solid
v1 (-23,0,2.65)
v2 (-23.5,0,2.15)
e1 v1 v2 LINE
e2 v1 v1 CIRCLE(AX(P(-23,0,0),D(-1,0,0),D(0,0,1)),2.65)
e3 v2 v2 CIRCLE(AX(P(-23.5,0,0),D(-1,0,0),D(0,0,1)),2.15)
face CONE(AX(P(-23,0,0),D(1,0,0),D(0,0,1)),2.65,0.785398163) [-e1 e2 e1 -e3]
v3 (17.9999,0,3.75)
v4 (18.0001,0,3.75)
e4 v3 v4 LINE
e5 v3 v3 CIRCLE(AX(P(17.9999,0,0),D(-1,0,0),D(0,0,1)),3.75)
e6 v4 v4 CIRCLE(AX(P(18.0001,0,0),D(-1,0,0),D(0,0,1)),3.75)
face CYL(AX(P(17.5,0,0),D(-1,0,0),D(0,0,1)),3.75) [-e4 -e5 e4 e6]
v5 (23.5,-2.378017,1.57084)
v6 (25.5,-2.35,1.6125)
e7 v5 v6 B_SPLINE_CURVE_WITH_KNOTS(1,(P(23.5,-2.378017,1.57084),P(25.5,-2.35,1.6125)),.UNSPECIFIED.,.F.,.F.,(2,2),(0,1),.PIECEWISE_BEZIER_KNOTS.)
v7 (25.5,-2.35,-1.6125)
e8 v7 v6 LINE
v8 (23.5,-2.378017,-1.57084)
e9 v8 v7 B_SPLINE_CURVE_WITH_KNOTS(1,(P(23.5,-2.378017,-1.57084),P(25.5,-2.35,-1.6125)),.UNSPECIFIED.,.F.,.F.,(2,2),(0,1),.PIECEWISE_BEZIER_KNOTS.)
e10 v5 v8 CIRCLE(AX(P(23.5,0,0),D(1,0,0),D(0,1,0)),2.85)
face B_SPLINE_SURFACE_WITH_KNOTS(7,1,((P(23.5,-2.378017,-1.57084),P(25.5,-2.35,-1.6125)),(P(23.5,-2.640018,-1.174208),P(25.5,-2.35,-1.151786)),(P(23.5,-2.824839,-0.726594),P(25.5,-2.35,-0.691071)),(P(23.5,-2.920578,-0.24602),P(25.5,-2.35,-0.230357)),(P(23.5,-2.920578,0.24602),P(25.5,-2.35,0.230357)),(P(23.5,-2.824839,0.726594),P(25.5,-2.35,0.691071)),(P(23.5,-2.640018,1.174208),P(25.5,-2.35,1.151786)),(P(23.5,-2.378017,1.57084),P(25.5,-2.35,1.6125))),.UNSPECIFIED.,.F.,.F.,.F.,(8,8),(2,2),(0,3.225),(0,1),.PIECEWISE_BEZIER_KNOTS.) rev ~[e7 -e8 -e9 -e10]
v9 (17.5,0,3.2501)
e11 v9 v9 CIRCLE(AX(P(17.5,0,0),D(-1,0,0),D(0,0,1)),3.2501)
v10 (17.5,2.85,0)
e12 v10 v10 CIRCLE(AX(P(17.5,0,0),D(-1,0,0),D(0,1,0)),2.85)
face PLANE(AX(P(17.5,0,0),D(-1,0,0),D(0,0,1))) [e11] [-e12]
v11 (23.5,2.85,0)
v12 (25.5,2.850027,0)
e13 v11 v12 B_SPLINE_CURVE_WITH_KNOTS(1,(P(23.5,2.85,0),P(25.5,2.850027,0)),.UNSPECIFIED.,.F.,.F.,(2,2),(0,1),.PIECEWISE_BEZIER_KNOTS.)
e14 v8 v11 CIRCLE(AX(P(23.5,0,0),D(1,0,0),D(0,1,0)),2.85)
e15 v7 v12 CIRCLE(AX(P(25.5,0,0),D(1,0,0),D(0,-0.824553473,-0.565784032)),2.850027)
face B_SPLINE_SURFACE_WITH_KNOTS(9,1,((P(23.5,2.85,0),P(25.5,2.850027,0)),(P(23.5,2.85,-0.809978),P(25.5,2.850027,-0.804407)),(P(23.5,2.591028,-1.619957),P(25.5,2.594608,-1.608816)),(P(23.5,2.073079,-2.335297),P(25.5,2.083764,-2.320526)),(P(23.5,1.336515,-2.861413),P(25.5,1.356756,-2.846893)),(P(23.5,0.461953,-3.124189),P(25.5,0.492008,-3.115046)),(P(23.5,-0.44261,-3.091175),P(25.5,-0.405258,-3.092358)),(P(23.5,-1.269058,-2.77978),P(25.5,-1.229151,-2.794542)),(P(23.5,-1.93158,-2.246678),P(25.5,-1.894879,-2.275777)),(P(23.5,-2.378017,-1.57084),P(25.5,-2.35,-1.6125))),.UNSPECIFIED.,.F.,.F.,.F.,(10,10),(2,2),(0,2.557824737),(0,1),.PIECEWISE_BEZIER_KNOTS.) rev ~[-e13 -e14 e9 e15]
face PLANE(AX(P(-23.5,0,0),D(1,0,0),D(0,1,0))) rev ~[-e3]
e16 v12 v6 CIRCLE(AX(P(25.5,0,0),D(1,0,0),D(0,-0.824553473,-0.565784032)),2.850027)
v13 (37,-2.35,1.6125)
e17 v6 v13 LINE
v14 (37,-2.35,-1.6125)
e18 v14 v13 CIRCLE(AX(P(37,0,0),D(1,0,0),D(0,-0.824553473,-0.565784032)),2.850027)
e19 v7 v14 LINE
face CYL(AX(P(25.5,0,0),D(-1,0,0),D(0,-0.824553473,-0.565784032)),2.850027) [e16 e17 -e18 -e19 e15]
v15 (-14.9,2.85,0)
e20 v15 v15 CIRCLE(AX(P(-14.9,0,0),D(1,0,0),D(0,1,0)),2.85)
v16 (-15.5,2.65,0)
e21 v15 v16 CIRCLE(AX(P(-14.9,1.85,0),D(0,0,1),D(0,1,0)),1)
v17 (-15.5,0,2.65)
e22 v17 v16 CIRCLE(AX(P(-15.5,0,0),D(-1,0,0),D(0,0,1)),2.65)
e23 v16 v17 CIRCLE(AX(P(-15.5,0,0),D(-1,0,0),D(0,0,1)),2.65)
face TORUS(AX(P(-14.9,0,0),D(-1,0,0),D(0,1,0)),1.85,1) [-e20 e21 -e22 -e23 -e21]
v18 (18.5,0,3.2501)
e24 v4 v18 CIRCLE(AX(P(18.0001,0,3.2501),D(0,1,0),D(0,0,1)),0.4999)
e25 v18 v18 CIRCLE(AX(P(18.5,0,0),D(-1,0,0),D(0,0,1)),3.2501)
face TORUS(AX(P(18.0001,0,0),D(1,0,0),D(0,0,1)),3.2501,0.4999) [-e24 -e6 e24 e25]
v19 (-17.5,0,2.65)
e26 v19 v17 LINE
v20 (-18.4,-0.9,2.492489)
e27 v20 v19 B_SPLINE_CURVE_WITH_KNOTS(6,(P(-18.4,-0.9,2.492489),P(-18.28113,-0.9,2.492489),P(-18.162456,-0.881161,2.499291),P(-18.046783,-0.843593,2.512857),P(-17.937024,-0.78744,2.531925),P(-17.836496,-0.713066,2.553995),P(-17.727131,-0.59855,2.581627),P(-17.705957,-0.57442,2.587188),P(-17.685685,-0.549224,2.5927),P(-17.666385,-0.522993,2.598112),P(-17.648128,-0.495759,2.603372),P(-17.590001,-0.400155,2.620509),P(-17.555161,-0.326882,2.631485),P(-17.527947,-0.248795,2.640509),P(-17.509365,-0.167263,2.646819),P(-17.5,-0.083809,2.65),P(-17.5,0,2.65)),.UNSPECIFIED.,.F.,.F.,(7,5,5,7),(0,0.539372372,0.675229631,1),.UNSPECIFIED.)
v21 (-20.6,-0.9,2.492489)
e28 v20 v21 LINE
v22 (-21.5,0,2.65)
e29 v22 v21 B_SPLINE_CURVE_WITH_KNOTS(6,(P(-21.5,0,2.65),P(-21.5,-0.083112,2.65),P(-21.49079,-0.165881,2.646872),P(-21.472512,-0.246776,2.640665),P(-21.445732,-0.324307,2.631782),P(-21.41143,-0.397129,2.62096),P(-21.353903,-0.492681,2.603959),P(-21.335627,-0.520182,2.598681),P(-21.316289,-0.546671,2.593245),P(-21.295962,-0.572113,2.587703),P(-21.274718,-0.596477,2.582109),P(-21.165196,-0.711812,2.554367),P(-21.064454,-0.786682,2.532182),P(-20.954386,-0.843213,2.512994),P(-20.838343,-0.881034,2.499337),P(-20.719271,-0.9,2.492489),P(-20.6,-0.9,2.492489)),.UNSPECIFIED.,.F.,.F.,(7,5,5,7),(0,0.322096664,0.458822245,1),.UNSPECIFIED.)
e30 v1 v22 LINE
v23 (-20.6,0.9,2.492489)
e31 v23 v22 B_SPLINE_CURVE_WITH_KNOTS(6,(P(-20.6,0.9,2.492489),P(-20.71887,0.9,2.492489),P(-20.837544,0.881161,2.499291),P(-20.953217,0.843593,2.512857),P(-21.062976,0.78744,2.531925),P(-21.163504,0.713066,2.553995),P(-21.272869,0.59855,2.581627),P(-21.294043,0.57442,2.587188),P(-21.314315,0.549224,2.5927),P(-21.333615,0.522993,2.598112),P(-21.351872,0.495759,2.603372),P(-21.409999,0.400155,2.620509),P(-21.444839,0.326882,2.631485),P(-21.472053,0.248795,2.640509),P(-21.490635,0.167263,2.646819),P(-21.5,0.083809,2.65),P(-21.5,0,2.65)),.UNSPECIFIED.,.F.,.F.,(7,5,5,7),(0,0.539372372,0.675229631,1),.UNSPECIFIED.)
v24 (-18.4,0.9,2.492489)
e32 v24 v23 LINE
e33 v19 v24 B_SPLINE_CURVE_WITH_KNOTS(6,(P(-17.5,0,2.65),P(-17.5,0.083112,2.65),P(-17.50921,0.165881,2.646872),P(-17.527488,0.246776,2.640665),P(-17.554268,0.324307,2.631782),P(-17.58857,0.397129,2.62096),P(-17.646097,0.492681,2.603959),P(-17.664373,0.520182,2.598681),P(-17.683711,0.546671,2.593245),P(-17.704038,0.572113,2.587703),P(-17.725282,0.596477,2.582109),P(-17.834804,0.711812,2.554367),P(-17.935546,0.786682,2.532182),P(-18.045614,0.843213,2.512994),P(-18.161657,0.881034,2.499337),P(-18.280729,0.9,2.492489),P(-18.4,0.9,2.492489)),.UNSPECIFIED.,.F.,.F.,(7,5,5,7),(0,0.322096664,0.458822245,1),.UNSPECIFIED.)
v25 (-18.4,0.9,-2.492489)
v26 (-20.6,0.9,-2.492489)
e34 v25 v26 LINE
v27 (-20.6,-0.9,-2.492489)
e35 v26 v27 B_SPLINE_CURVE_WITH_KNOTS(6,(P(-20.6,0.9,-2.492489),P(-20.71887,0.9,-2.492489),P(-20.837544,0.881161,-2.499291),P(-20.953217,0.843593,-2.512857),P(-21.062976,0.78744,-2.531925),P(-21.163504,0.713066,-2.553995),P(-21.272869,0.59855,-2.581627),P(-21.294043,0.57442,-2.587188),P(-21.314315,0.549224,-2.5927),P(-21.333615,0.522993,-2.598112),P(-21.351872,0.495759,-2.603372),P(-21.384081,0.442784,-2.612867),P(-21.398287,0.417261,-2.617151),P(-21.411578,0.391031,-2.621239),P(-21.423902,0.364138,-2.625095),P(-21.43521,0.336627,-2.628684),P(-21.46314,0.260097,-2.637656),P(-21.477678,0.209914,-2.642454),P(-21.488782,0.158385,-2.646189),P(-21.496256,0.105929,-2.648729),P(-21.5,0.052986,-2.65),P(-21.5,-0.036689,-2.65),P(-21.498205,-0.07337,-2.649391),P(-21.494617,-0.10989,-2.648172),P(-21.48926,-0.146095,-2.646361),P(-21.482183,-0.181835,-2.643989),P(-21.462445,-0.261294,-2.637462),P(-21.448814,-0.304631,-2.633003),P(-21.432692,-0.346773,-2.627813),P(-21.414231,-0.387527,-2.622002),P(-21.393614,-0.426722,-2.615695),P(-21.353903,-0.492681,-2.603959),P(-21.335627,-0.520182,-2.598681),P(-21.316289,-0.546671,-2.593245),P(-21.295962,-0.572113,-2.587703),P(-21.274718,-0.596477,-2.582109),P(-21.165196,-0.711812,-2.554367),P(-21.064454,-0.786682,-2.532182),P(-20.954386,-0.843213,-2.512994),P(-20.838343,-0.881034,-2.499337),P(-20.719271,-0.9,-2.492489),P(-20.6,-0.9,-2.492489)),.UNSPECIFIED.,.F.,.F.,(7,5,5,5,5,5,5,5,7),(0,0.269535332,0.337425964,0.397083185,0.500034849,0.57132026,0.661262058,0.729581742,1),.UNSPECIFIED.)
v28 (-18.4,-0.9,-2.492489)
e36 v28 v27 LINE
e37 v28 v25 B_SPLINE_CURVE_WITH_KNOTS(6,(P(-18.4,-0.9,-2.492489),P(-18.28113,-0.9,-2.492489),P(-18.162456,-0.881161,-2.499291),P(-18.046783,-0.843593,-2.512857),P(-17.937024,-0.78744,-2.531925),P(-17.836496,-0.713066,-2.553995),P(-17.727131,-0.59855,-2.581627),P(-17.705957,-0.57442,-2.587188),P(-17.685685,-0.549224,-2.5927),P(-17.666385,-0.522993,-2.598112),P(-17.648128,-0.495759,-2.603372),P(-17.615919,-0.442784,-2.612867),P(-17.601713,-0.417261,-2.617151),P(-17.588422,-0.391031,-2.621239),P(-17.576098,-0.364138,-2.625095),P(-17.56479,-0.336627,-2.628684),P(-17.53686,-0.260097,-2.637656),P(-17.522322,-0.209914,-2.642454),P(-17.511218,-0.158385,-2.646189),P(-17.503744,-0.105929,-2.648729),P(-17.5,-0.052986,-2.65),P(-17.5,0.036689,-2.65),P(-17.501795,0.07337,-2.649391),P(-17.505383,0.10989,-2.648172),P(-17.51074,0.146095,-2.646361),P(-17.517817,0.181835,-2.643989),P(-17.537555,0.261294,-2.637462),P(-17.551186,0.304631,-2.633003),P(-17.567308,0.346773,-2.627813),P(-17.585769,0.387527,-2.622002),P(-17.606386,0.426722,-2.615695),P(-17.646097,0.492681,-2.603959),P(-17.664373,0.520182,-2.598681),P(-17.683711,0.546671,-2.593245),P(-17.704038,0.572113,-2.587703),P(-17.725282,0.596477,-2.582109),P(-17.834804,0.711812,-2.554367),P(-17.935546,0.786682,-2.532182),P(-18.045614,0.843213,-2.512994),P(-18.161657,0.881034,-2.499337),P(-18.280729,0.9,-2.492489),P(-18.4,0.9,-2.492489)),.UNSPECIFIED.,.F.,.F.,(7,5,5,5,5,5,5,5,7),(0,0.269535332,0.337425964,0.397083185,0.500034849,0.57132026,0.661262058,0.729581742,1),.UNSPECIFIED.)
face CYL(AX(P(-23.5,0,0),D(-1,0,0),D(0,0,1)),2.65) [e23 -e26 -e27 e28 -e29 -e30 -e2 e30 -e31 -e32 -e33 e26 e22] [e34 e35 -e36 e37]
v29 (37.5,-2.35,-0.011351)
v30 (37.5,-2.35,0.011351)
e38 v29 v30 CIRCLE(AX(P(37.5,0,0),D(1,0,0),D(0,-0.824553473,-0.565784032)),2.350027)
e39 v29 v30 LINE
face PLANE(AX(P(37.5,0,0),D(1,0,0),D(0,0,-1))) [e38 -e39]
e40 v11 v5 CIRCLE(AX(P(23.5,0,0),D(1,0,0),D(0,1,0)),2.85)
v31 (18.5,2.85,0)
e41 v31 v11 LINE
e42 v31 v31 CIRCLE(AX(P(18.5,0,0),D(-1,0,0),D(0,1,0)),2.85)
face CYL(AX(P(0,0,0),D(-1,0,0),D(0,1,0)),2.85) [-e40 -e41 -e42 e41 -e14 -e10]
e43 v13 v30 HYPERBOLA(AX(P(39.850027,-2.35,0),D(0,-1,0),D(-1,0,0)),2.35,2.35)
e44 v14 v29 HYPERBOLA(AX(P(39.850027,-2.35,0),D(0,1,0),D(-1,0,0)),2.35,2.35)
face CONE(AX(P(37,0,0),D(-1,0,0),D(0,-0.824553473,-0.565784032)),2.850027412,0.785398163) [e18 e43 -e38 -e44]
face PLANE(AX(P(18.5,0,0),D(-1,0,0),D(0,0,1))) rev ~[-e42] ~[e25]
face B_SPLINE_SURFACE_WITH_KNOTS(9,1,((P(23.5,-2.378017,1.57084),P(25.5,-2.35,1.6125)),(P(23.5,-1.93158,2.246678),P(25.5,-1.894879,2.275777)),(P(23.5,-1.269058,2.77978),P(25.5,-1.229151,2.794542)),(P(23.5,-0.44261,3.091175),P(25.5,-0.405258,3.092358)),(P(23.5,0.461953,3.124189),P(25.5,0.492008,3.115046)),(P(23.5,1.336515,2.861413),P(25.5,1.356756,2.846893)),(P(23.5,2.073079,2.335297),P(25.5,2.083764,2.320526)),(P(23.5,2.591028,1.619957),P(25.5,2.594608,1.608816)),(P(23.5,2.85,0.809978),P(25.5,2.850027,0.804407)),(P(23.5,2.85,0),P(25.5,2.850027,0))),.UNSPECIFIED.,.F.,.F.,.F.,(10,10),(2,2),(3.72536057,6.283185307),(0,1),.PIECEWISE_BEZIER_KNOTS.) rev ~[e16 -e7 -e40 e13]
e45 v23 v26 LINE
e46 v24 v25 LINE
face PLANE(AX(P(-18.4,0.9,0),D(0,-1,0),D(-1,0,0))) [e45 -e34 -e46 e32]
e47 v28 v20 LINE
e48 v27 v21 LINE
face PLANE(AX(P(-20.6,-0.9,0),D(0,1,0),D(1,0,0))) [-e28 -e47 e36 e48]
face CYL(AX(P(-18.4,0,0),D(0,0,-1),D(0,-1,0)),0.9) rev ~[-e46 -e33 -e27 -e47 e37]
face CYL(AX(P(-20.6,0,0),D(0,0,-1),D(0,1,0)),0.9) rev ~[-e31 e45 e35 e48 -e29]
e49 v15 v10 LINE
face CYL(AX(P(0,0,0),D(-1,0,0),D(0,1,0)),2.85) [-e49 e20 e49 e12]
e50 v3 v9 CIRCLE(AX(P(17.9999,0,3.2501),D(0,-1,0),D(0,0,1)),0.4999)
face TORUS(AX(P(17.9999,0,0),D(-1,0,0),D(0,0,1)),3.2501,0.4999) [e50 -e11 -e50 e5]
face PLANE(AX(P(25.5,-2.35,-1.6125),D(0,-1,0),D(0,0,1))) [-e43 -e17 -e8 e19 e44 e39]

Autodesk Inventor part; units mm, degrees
ref_plane "YZ Plane" through (0, 0, 0) normal (1, 0, 0) x (0, 1, 0)
sketch "Sketch1" plane through (0, 0, 0) normal (1, 0, 0) x (0, 1, 0)
  circle A0 centre (0, 0) radius 2.85
  dimension "diameter" = 5.7
extrude "Shaft" add sketch "Sketch1" along normal mid plane 47
sketch "Sketch2" plane through (0, 0, 0) normal (0, 0, 1) x (1, 0, 0)
  line L0 (-23.5, -2.85) -> (-23.5, 2.85) construction
  line L1 (23.5, -2.85) -> (-23.5, -2.85) construction
  line L2 (23.5, 2.85) -> (23.5, -2.85) construction
  line L3 (-23.5, 2.85) -> (23.5, 2.85) construction
  line L4 (-23.5, -2.85) -> (23.5, -2.85) projected
  line L5 (-16.5, -2.85) -> (-16.5, -2.85)
  line L6 (-23.5, -2.85) -> (23.5, -2.85) projected
  line L7 (-21.5, 0) -> (-17.5, 0) construction
  line L8 (-20.6, -0.9) -> (-18.4, -0.9)
  line L9 (-18.4, 0.9) -> (-20.6, 0.9)
  arc A0 (-20.6, 0.9) -> (-20.6, -0.9) centre (-20.6, 0) ccw
  arc A1 (-18.4, -0.9) -> (-18.4, 0.9) centre (-18.4, 0) ccw
  point P0 (0, 0)
  point P1 (23.5, 0)
  point P2 (-19.5, 0)
  dimension "d17" = 1.8
  dimension "d20" = 2
  dimension "d21" = 1
  dimension "d22" = 7
extrude "Slot for Differential Gear" cut sketch "Sketch2" along normal through all both and the other way through all
ref_plane "Work Plane1" through (25.5, 0, 0) normal (1, 0, 0) x (0, 0, -1)
sketch "Sketch3" plane through (25.5, 0, 0) normal (1, 0, 0) x (0, 0, -1)
  arc A0 (1.6583, -2.5) -> (-1.6583, -2.5) centre (0, 0) ccw construction
  circle A1 centre (0, 0) radius 2.85 construction
  line L0 (-1.6583, -2.5) -> (1.6583, -2.5)
  arc A2 (1.6125, -2.35) -> (-1.6125, -2.35) centre (0, 0) ccw
  line L1 (1.6125, -2.35) -> (-1.6125, -2.35)
  point P0 (-1.3684, -2.5)
  point P1 (1.3684, -2.5)
  dimension "d49" = 3
  dimension "d50" = 2.5
  dimension "wheel_offset" = 0.15
extrude "Wheel Insert Profile" add sketch "Sketch3" along normal blind 12
loft "Loft1" add section 1 edges at (23.5, -2.85, 0) section 2 edges at (25.5, -2.35, 0) (25.5, 2.85, 0)
ref_plane "Work Plane2" through (17.5, 0, 0) normal (-1, 0, 0) x (0, 0, 1)
sketch "Sketch4" plane through (17.5, 0, 0) normal (-1, 0, 0) x (0, 0, 1)
  circle A0 centre (0, 0) radius 3.75
  dimension "d35" = 7.5
extrude "Stopper" add sketch "Sketch4" against normal blind 1
fillet "Fillet1" radius 0.5 2 edges at (17.5, 0, -3.75) (18.5, 0, -3.75)
sketch "Sketch8" plane through (-23.5, 0, 0) normal (-1, 0, 0) x (0, 0, 1)
  circle A0 centre (0, 0) radius 2.85 projected
  circle A1 centre (0, 0) radius 2.7 construction
  circle A2 centre (0, 0) radius 2.65
  dimension "d68" = 5.4
  dimension "d69" = 0.05
extrude "Differential Gear Insert Profile" cut sketch "Sketch8" against normal blind 8
fillet "Fillet3" radius 1 1 edges at (-15.5, -2.85, 0)
chamfer "Chamfer4" distance 0.5 angle 45 2 edges at (-23.5, 0, -2.65) (37.5, 2.85, 0)
properties part number "rear shaft v2"
